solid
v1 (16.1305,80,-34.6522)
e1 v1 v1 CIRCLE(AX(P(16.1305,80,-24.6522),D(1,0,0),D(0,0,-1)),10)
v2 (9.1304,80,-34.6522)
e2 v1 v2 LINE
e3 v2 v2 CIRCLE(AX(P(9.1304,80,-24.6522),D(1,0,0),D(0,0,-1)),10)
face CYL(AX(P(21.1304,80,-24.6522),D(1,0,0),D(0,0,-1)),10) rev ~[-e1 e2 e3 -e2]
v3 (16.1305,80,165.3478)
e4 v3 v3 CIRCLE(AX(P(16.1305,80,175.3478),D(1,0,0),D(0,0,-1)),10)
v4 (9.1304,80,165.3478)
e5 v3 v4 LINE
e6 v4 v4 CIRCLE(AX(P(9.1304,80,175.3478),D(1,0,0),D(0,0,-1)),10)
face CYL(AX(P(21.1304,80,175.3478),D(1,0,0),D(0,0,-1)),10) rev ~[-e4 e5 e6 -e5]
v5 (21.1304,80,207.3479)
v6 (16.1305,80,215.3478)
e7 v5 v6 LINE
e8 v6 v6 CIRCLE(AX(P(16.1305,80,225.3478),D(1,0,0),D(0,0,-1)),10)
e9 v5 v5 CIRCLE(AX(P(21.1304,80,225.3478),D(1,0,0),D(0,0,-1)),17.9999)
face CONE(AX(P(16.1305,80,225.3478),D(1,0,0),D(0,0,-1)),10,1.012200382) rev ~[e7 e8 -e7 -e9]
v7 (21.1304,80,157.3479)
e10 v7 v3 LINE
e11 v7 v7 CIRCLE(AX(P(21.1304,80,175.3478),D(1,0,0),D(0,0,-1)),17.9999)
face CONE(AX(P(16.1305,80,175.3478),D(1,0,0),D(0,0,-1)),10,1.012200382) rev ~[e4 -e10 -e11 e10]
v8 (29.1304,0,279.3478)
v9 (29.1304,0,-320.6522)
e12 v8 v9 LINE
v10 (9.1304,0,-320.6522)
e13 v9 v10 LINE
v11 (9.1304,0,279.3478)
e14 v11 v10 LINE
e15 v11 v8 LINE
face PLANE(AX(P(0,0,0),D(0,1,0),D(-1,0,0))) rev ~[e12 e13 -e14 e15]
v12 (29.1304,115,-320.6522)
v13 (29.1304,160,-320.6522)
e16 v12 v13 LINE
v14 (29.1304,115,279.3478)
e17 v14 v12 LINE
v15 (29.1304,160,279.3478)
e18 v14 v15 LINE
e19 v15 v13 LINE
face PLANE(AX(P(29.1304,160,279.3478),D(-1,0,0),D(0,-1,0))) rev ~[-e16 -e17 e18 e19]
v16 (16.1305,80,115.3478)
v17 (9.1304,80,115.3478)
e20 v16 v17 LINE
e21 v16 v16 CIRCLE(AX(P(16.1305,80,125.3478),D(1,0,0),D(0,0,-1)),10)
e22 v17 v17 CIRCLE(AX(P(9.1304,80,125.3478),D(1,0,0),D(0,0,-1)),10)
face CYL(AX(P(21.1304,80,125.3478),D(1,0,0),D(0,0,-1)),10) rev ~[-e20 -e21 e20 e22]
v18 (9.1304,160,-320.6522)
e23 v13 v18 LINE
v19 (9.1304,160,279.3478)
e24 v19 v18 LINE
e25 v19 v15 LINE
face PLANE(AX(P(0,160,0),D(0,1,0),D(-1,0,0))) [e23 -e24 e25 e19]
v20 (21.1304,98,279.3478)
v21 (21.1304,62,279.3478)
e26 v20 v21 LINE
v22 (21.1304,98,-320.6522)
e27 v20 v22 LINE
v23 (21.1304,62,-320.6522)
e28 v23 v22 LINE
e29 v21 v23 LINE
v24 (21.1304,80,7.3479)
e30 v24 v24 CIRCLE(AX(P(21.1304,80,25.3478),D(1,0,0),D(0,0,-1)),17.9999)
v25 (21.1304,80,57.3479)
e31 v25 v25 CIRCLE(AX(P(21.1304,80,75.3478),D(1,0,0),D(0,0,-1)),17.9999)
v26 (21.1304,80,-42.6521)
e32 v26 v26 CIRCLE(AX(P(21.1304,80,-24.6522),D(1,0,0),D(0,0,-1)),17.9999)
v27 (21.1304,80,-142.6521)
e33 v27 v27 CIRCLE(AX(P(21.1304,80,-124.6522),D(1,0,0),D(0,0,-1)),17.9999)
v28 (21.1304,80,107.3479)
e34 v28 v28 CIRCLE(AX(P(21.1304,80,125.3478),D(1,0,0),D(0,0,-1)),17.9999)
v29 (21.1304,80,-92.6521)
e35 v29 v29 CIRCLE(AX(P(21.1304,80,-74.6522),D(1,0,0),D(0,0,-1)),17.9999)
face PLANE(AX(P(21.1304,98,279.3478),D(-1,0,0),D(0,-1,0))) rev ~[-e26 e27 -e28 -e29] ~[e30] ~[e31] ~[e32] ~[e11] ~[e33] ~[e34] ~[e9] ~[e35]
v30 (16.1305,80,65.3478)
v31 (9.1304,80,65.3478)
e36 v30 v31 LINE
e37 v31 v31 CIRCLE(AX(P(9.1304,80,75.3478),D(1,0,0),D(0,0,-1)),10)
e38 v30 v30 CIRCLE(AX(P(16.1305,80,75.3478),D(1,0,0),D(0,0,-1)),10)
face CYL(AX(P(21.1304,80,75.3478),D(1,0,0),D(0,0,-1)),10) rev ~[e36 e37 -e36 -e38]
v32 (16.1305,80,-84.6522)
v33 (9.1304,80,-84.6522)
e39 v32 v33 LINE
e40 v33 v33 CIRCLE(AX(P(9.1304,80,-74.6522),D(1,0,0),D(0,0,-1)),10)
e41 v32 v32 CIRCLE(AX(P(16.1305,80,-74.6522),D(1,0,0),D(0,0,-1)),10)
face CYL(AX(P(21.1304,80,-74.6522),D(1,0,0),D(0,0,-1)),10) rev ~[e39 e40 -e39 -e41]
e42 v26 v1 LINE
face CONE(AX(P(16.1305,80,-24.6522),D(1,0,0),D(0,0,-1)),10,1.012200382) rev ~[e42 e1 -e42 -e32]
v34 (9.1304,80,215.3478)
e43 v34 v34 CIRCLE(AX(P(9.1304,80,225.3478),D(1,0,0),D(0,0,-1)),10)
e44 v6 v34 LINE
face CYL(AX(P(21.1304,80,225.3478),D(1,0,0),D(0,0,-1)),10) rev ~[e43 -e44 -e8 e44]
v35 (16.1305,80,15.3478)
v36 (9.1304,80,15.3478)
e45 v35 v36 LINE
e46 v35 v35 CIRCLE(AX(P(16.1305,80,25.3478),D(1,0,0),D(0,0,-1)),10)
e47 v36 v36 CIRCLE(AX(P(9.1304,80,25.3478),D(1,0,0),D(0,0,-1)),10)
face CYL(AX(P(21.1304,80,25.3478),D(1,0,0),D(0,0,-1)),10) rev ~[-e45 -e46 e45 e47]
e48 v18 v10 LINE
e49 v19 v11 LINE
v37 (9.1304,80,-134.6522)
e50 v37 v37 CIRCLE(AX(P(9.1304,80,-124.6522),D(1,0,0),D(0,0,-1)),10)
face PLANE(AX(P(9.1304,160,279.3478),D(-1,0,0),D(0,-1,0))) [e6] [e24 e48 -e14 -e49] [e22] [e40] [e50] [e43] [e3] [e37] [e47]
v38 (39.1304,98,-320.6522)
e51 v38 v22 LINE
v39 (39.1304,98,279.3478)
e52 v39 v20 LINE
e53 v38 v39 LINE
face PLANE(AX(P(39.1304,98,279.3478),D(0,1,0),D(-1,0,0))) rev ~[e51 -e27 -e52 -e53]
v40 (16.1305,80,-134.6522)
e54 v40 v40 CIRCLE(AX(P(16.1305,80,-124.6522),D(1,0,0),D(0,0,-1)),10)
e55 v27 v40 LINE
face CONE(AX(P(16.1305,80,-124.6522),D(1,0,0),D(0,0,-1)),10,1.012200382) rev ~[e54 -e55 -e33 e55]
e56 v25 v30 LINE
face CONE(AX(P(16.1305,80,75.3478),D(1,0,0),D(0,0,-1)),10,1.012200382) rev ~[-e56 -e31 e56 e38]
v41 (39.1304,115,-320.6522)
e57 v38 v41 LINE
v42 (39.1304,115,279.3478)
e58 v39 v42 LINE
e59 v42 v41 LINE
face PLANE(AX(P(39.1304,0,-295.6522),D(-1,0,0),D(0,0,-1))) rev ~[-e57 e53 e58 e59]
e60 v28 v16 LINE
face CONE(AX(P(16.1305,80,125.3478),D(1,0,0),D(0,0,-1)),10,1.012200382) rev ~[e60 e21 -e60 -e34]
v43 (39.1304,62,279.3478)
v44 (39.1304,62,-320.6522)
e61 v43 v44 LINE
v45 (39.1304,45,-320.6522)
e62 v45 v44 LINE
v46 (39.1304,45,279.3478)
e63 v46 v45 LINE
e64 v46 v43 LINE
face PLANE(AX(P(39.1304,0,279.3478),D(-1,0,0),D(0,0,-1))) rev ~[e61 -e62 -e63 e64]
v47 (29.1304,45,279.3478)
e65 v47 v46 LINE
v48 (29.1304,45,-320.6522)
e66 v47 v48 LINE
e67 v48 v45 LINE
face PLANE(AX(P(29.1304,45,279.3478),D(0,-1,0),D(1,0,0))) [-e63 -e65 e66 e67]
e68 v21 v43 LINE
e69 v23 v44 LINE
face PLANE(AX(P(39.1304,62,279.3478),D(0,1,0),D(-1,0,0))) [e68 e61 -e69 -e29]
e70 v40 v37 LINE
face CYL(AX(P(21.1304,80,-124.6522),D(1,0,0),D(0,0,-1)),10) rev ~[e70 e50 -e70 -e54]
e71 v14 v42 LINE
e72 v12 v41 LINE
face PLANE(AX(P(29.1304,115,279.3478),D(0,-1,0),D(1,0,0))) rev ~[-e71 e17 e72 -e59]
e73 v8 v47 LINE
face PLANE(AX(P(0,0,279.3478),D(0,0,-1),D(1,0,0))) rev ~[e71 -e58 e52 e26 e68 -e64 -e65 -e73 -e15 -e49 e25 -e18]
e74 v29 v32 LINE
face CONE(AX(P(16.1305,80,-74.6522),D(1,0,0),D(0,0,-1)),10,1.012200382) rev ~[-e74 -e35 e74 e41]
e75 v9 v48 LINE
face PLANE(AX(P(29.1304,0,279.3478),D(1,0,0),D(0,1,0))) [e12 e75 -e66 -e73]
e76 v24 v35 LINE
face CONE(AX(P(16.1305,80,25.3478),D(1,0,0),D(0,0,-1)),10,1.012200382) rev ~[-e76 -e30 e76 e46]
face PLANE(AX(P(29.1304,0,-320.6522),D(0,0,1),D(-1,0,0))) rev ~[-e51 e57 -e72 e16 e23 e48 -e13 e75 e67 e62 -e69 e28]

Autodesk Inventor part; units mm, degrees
ref_plane "YZ Plane" through (0, 0, 0) normal (1, 0, 0) x (0, 1, 0)
ref_plane "XZ Plane" through (0, 0, 0) normal (0, 1, 0) x (-1, 0, 0)
ref_plane "XY Plane" through (0, 0, 0) normal (0, 0, 1) x (1, 0, 0)
sketch "Sketch1" plane through (0, 0, 0) normal (0, 1, 0) x (-1, 0, 0)
  line L0 (0, 279.3478) -> (-39.1304, 279.3478)
  line L1 (-39.1304, 279.3478) -> (-39.1304, -320.6522)
  line L2 (-39.1304, -320.6522) -> (0, -320.6522)
  line L3 (0, -320.6522) -> (0, 279.3478)
  line L4 (-39.1304, 279.3478) -> (-29.1304, 279.3478)
  line L5 (-29.1304, 254.3478) -> (-39.1304, 254.3478)
  line L6 (-39.1304, 254.3478) -> (-39.1304, 279.3478)
  line L7 (-39.1304, -320.6522) -> (-29.1304, -320.6522)
  line L8 (-29.1304, -295.6522) -> (-39.1304, -295.6522)
  line L9 (-39.1304, -295.6522) -> (-39.1304, -320.6522)
  point P0 (0, 0)
  point P1 (-39.1304, 254.3478)
  point P2 (-39.1304, -295.6522)
  dimension "d0" = 600
  dimension "d4" = 25
  dimension "d5" = 25
  dimension "d28" = 39.1304
extrude "Extrusion1" add sketch "Sketch1" along normal blind 160
sketch "Sketch2" plane through (0, 0, 279.3478) normal (0, 0, 1) x (1, 0, 0)
  line L0 (0, 160) -> (39.1304, 160) projected
  line L1 (0, 160) -> (39.1304, 160)
  line L2 (39.1304, 160) -> (39.1304, 0)
  line L3 (39.1304, 0) -> (0, 0)
  line L4 (0, 0) -> (0, 160)
  line L5 (39.1304, 160) -> (29.1304, 160)
  line L6 (29.1304, 160) -> (29.1304, 115)
  line L7 (29.1304, 115) -> (39.1304, 115)
  line L8 (39.1304, 115) -> (39.1304, 160)
  line L9 (39.1304, 0) -> (29.1304, 0)
  line L10 (29.1304, 0) -> (29.1304, 45)
  line L11 (29.1304, 45) -> (39.1304, 45)
  line L12 (39.1304, 45) -> (39.1304, 0)
  circle A0 centre (39.1304, 80) radius 18
  line L13 (21.1304, 75) -> (39.1304, 75)
  line L14 (39.1304, 75) -> (39.1304, 98)
  line L15 (39.1304, 98) -> (21.1304, 98)
  line L16 (21.1304, 98) -> (21.1304, 75)
  line L17 (21.1304, 75) -> (39.1304, 75)
  line L18 (39.1304, 75) -> (39.1304, 62)
  line L19 (39.1304, 62) -> (21.1304, 62)
  line L20 (21.1304, 62) -> (21.1304, 75)
  line L21 (39.1304, 0) -> (39.1304, 160) projected
  line L22 (0, 160) -> (9.1304, 160)
  line L23 (9.1304, 160) -> (9.1304, 0)
  line L24 (9.1304, 0) -> (0, 0)
  line L25 (0, 0) -> (0, 160)
  point P0 (0, 0)
  point P1 (34.1304, 115)
  point P2 (34.1304, 160)
  point P3 (39.1304, 45)
  point P4 (39.1304, 115)
  dimension "d6" = 10
  dimension "d7" = 45
  dimension "d8" = 45
  dimension "d9" = 18
  dimension "d10" = 36
  dimension "d11" = 80
  dimension "d12" = 80
  dimension "d15" = 30
extrude "Extrusion2" cut sketch "Sketch2" against normal up to surface (600 mm away) contours L0 L23 L3 L4 | L0 L2 L7 L6 | L10 L11 L2 L3 | L2 L13 A0 | A0 L16 L15 | L2 A0 L13 | A0 L13 L16 | L19 L20 L13 A0
sketch "Sketch3" plane through (21.1304, 62, 279.3478) normal (1, 0, 0) x (0, 0, -1)
  line L0 (600, 0) -> (0, 0) projected
  line L1 (0, 0) -> (0, 36) projected
  line L2 (0, 36) -> (600, 36) projected
  circle A0 centre (54, 18) radius 10
  circle A1 centre (104, 18) radius 10
  circle A2 centre (154, 18) radius 10
  circle A3 centre (204, 18) radius 10
  circle A4 centre (254, 18) radius 10
  circle A5 centre (304, 18) radius 10
  circle A6 centre (354, 18) radius 10
  circle A7 centre (404, 18) radius 10
  circle A8 centre (454, 18) radius 10
  point P0 (279.3478, -62)
  dimension "d18" = 50
extrude "Extrusion3" cut sketch "Sketch3" against normal blind 25 contours A0 | A1 | A2 | A3 | A4 | A5 | A6 | A7
chamfer "Chamfer1" distance 8 distance2 5 8 edges at (21.1304, 80, 235.3478) (21.1304, 80, 185.3478) (21.1304, 80, 135.3478) (21.1304, 80, 85.3478) (21.1304, 80, 35.3478) (21.1304, 80, -14.6522) (21.1304, 80, -64.6522) (21.1304, 80, -114.6522) measured on face at (21.1304, 80, -258.6522)
properties part number "MainRails" material "Aluminum 6061"
